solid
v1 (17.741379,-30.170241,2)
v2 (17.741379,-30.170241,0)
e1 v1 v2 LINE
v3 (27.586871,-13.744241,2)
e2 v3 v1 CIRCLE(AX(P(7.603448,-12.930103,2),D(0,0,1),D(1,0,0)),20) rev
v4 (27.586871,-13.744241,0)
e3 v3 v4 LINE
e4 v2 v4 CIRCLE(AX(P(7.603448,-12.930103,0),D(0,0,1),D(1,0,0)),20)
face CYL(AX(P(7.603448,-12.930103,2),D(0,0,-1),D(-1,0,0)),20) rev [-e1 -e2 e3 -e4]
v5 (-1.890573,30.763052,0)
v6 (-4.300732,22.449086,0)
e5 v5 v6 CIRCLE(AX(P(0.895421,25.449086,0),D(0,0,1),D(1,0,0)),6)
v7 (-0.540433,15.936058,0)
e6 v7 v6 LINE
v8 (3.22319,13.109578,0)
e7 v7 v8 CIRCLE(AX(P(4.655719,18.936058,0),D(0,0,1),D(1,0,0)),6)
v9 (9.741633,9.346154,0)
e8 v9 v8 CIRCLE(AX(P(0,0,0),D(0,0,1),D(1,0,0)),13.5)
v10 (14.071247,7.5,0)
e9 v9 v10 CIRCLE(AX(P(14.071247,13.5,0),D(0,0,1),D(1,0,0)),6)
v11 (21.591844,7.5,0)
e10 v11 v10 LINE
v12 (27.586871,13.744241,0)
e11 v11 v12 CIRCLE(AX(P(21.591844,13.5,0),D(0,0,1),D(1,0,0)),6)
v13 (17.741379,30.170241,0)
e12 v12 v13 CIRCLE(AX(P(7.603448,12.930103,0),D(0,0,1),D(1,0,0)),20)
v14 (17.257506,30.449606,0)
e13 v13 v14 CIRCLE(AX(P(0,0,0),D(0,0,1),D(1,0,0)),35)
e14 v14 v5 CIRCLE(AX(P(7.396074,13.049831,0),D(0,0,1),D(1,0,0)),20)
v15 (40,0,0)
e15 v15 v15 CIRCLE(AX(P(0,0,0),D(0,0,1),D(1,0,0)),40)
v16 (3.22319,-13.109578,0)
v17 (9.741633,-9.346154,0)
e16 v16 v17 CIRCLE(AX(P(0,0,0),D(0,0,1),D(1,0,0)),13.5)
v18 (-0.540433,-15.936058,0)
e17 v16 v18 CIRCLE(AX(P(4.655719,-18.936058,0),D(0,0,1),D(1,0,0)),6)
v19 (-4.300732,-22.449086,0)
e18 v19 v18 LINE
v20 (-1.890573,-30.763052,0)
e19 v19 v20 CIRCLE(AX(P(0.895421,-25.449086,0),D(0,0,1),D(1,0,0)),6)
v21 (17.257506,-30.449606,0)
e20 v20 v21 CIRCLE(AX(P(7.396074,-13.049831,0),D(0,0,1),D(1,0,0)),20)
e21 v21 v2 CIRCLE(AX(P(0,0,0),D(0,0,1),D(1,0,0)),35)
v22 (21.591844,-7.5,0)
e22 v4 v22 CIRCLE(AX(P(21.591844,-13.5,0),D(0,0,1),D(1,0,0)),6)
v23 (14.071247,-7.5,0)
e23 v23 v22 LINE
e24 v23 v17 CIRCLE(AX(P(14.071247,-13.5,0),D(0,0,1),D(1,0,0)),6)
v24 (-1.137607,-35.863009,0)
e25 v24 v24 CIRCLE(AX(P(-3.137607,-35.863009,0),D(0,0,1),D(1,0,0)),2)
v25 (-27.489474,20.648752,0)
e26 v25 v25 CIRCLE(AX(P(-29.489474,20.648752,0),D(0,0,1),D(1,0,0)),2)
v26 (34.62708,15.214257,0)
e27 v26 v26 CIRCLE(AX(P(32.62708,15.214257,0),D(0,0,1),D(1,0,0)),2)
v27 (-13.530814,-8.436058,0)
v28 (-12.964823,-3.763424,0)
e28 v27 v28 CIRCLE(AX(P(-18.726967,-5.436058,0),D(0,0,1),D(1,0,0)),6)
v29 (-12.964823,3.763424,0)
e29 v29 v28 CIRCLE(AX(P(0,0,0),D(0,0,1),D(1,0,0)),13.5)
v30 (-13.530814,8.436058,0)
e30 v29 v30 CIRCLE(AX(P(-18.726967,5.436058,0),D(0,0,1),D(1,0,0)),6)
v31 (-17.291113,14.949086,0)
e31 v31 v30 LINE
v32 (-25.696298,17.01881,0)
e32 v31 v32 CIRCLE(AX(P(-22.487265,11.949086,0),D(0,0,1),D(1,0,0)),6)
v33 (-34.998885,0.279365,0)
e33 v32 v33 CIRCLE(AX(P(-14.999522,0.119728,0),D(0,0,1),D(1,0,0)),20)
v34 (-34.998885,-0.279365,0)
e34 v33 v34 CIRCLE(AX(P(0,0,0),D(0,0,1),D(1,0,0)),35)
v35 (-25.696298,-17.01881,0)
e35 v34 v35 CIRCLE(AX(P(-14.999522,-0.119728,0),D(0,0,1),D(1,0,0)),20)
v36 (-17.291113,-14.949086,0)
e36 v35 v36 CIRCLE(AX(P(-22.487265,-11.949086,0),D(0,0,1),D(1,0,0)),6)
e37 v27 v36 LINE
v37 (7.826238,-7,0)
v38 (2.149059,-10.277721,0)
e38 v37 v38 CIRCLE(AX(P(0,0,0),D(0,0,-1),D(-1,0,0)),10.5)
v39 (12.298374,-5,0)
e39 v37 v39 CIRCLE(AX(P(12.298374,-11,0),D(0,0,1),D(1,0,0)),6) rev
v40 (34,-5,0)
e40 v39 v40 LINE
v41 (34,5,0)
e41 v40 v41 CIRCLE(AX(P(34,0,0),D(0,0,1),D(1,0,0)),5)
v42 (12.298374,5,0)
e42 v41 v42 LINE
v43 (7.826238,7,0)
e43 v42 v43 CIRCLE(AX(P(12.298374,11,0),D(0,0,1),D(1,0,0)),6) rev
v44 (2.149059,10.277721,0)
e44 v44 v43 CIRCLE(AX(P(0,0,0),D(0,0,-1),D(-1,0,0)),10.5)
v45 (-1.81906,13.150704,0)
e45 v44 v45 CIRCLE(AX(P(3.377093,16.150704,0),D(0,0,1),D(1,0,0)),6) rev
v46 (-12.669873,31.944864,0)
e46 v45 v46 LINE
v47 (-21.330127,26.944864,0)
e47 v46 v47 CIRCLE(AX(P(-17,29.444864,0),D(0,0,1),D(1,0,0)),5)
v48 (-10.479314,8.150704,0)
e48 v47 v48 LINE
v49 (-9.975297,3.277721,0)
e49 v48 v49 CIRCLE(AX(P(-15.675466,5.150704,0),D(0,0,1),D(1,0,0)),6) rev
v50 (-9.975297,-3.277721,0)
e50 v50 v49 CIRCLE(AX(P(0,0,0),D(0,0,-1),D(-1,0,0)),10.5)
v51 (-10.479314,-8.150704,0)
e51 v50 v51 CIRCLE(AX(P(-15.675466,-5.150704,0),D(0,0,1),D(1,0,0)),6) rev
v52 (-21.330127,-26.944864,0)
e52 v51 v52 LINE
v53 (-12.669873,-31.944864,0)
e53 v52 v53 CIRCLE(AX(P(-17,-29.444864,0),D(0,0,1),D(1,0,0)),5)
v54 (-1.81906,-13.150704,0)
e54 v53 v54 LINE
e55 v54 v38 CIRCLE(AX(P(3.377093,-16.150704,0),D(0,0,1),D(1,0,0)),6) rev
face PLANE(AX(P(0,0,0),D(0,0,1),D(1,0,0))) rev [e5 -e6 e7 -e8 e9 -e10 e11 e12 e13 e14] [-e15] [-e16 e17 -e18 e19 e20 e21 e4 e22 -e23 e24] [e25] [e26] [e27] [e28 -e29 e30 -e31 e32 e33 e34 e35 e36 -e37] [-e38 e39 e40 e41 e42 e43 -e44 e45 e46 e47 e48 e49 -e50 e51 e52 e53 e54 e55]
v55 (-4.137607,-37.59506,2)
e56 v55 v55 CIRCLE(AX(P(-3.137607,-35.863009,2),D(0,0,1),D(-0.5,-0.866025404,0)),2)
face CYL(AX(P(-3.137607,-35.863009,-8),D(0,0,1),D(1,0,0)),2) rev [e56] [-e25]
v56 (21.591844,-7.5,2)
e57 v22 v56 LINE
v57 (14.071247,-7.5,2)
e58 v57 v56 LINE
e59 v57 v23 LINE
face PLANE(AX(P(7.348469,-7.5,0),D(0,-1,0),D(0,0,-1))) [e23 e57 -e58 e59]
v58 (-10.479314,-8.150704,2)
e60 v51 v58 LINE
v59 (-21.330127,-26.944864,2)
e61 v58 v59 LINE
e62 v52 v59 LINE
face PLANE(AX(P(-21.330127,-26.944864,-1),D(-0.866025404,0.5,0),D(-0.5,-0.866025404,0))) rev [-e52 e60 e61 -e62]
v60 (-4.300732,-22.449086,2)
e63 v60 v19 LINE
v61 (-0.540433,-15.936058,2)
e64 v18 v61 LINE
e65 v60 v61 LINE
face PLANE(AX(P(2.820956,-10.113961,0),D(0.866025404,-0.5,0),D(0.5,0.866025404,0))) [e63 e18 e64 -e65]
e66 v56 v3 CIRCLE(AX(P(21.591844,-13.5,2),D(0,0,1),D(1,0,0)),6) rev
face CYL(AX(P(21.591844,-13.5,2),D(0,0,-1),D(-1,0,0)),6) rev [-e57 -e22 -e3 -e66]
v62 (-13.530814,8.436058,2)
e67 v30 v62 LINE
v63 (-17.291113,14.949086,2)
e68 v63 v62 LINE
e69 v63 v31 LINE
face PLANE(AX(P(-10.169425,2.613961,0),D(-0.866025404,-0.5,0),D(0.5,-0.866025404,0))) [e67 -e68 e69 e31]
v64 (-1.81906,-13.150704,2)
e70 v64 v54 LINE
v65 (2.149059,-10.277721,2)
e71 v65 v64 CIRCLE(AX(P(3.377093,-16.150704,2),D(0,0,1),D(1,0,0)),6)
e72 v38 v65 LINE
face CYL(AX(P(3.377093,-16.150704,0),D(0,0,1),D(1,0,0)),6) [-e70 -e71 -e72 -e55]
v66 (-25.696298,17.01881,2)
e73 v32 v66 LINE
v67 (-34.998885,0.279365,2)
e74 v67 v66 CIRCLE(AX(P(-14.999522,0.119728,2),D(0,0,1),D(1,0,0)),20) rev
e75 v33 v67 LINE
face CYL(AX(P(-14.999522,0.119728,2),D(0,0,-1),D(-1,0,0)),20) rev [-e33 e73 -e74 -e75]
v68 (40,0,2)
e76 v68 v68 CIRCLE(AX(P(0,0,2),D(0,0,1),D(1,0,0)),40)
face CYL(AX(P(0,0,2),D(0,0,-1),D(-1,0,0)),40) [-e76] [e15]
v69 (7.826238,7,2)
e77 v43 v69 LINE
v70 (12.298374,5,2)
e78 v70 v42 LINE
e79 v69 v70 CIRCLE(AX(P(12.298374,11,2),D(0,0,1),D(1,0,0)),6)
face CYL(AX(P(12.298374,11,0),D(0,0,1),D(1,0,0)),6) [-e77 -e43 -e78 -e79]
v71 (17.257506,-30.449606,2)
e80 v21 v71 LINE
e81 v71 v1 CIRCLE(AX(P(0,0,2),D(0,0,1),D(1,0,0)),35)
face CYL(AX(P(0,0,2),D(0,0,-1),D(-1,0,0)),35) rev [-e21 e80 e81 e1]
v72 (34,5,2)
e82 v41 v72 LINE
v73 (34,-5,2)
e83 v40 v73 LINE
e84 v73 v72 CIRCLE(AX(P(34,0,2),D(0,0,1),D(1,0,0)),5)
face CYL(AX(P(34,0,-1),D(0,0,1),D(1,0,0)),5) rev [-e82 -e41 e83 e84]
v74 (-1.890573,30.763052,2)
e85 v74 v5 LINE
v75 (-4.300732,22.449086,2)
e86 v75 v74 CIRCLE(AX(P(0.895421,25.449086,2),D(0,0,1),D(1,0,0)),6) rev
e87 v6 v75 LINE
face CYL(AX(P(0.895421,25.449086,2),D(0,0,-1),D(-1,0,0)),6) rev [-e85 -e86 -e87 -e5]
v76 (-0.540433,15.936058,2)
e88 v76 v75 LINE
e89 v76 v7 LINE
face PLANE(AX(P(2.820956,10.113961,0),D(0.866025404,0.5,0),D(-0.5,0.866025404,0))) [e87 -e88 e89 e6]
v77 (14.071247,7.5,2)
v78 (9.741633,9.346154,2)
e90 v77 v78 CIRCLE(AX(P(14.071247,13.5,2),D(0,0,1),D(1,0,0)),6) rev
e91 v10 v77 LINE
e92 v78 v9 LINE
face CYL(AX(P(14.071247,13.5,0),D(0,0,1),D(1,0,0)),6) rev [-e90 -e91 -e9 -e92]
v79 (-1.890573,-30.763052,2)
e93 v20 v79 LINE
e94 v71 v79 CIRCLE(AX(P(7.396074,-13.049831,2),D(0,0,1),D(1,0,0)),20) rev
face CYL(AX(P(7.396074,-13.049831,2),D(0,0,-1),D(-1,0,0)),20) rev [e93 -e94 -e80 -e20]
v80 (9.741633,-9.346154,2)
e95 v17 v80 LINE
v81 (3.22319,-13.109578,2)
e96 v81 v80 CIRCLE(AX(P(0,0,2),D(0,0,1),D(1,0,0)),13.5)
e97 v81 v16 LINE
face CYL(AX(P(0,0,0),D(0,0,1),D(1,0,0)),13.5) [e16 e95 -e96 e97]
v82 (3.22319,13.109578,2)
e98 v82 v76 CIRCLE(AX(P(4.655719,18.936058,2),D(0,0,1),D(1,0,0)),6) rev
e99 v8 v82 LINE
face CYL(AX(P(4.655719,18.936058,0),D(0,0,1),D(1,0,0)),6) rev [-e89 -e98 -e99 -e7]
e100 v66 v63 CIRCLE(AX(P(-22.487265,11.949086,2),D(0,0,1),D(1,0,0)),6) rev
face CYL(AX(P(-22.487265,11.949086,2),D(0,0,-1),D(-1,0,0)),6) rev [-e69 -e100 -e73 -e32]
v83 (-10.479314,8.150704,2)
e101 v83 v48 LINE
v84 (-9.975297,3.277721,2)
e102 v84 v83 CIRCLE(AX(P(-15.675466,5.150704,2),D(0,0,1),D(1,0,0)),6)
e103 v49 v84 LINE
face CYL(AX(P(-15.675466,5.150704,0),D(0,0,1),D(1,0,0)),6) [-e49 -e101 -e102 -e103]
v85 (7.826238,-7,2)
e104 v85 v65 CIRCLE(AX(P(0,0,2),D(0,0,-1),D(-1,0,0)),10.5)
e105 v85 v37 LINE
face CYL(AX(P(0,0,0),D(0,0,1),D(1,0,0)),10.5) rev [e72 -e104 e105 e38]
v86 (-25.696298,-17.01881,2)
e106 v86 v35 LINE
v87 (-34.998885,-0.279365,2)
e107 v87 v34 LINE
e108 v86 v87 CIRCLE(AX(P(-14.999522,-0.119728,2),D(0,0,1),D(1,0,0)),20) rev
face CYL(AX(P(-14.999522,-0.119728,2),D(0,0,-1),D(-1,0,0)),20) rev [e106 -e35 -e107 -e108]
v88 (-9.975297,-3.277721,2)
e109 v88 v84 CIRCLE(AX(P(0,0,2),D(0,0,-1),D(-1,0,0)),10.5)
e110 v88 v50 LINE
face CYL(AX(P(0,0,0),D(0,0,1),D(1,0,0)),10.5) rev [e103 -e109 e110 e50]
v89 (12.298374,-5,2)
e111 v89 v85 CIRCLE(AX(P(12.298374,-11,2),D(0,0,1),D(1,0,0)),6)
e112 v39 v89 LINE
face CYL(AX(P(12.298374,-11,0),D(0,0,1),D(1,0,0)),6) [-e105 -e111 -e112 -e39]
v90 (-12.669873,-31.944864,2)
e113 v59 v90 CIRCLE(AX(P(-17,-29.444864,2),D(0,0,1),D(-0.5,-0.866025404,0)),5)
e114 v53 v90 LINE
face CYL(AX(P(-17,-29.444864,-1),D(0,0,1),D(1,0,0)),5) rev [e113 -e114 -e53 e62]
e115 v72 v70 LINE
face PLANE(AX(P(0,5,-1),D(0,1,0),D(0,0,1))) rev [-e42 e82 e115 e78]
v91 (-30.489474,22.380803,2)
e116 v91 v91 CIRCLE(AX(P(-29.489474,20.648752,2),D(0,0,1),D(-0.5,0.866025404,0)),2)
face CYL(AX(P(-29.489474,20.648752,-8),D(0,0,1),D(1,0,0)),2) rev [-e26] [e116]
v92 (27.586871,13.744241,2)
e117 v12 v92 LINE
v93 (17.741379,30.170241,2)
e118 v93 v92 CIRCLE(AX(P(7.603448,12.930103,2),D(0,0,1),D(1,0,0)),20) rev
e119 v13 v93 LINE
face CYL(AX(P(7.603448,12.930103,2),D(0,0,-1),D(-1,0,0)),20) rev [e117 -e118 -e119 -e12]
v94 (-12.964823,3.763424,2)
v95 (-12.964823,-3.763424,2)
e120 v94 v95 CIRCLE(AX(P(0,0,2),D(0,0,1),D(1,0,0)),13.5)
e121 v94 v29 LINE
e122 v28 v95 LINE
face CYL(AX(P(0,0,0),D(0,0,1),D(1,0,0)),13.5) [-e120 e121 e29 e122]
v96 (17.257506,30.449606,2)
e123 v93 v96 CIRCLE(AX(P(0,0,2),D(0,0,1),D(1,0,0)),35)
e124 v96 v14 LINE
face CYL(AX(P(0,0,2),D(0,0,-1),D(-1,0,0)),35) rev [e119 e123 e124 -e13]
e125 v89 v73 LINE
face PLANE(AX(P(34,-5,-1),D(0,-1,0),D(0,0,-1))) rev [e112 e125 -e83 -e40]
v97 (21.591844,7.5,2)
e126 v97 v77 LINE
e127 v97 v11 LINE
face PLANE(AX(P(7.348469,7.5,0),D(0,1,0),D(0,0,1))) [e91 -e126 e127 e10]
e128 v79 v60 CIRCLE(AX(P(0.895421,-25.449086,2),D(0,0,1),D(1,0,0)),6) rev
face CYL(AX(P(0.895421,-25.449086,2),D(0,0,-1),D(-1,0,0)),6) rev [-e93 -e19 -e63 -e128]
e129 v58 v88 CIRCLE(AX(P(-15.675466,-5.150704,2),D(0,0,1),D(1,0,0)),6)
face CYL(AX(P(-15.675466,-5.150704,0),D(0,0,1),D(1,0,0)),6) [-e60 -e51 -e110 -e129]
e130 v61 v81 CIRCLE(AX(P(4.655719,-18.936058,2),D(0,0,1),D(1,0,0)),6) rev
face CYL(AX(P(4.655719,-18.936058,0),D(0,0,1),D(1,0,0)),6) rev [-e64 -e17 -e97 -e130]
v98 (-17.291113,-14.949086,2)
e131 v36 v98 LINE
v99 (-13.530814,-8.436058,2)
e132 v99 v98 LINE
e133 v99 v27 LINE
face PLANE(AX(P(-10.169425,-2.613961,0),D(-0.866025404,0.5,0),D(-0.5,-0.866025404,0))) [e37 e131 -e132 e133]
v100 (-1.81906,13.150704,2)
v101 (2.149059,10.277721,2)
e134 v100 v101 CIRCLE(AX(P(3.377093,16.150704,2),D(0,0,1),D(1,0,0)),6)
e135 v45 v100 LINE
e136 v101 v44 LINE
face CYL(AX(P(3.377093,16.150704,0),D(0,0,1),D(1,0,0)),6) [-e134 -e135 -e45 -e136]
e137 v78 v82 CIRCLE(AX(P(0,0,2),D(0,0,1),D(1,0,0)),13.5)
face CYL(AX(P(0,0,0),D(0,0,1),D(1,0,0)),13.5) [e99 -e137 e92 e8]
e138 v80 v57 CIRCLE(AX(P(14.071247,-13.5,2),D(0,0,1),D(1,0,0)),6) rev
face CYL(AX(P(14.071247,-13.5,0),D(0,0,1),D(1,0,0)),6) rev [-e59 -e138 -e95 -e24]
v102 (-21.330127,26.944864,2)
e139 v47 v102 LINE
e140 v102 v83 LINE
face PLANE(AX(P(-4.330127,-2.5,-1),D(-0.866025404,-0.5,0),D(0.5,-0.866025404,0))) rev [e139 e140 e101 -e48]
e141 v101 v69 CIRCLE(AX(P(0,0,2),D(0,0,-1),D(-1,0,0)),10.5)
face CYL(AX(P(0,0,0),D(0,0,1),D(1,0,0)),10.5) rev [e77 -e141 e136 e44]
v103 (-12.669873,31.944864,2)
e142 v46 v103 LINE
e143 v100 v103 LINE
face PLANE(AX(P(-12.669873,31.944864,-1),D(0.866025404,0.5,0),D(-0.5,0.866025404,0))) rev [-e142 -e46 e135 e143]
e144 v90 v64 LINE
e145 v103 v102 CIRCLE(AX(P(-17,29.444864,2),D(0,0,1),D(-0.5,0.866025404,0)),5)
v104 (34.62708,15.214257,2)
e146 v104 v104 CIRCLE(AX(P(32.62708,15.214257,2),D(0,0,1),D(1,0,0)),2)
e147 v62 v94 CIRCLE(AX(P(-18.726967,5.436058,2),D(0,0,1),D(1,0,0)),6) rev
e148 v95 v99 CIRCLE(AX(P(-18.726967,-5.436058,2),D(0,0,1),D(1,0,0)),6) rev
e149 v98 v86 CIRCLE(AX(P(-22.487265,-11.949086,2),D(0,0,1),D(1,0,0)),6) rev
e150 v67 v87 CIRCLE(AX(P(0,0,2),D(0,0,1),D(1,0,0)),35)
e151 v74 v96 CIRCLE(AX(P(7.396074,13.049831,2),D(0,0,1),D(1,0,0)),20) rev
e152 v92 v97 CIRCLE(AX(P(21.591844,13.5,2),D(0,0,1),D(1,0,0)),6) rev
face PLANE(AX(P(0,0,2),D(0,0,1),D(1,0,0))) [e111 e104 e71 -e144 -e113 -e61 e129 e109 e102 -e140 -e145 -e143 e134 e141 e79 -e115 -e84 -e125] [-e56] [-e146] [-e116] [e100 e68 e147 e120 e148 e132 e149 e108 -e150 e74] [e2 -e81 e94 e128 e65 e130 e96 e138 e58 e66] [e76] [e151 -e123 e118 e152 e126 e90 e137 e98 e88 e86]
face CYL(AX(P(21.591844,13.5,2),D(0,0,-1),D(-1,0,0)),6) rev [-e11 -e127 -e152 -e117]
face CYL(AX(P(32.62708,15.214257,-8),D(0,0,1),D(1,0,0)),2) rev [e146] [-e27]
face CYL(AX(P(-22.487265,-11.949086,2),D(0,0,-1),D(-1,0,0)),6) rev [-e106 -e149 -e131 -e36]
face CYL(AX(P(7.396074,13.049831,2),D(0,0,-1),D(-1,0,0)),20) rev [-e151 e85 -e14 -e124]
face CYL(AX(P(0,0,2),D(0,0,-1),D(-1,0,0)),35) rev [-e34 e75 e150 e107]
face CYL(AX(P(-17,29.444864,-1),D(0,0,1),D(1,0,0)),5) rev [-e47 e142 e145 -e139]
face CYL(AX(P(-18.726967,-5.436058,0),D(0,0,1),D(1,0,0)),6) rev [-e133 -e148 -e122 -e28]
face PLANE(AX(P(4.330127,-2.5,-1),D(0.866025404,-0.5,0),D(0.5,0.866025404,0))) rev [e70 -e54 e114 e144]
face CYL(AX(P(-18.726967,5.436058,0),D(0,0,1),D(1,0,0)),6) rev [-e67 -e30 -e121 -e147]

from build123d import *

# Parameters (mm, degrees)
SKETCH1_R                = 40
SKETCH1_R_2              = 35
BOSS_EXTRUDE1_DEPTH      = 2
BOSS_EXTRUDE2_DEPTH      = 2
SKETCH3_R                = 3
CUT_EXTRUDE1_DEPTH       = 2
FILLET1_DEPTH            = 2
SKETCH4_R                = 2
CUT_EXTRUDE2_DEPTH       = 10
BOSS_EXTRUDE3_START      = -2
BOSS_EXTRUDE3_DEPTH      = 2
BOSS_EXTRUDE4_START      = -2
SKETCH7_R                = 13.5
SKETCH7_R_2              = 10.5
BOSS_EXTRUDE4_DEPTH      = 2
FILLET2_R                = 6
CUT_EXTRUDE3_DEPTH       = 3
CIRPATTERN1_COUNT        = 3
FILLET2_OF_CIRPATTERN1_R = 6
FILLET3_R                = 6


with BuildPart() as part:
    # Sketch1 → Boss-Extrude1 (new body)
    with BuildSketch(Plane.XY):
        Circle(SKETCH1_R)
        Circle(SKETCH1_R_2, mode=Mode.SUBTRACT)
    extrude(amount=BOSS_EXTRUDE1_DEPTH)

    # Sketch2 → Boss-Extrude2 (add)
    with BuildSketch(Plane(origin=(0, 0, 0), x_dir=(-1, 0, 0), z_dir=(0, 0, -1))):
        with BuildLine():
            Line((-29, 5), (-34.641016151, 5))
            Line((-34.641016151, 5), (-37.165171868, 5))
            ThreePointArc((-37.165171868, 5), (-37.5, 0), (-37.165171868, -5))
            Line((-37.165171868, -5), (-29, -5))
            ThreePointArc((-29, -5), (-24, 0), (-29, 5))
        make_face()
        with BuildLine():
            Line((-34, -3), (-29, -3))
            ThreePointArc((-29, -3), (-26, 0), (-29, 3))
            Line((-29, 3), (-34, 3))
            ThreePointArc((-34, 3), (-37, 0), (-34, -3))
        make_face(mode=Mode.SUBTRACT)
    boss_extrude2 = extrude(amount=-BOSS_EXTRUDE2_DEPTH)

    # Sketch3 → Cut-Extrude1 (cut)
    with BuildSketch(Plane(origin=(0, 0, 0), x_dir=(-1, 0, 0), z_dir=(0, 0, -1))):
        with Locations((-34, 0)):
            Circle(SKETCH3_R)
    cut_extrude1 = extrude(amount=-CUT_EXTRUDE1_DEPTH, mode=Mode.SUBTRACT)

    # Fillet1: read off the stored shape, not the designer's step
    # Fillet1 outline → Fillet1 (add)
    with BuildSketch(Plane.XY):
        with BuildLine():
            ThreePointArc((29, -5), (26.543386825, -4.354888254), (24.720689655, -2.586020683))
            ThreePointArc((24.720689655, -2.586020683), (26.992450638, -17.835874241), (17.74137931, -30.170241301))
            ThreePointArc((17.74137931, -30.170241301), (29.057943842, -19.509892353), (34.641016151, -5))
            Line((34.641016151, -5), (29, -5))
        make_face()
        with BuildLine():
            ThreePointArc((17.74137931, 30.170241301), (26.992450638, 17.835874241), (24.720689655, 2.586020683))
            ThreePointArc((24.720689655, 2.586020683), (26.543386825, 4.354888254), (29, 5))
            Line((29, 5), (34.641016151, 5))
            ThreePointArc((34.641016151, 5), (29.057943842, 19.509892353), (17.74137931, 30.170241301))
        make_face()
    fillet1 = extrude(amount=FILLET1_DEPTH)

    # Sketch4 → Cut-Extrude2 (cut)
    with BuildSketch(Plane.XY.offset(2)):
        with Locations((32.627080333, 15.214257423)):
            Circle(SKETCH4_R)
    cut_extrude2 = extrude(amount=-CUT_EXTRUDE2_DEPTH, mode=Mode.SUBTRACT)

    # Sketch5 → Boss-Extrude3 (add)
    with BuildSketch(Plane.XY.offset(2).offset(BOSS_EXTRUDE3_START)):
        with BuildLine():
            Line((7.348469228, 7.5), (34.186985828, 7.5))
            ThreePointArc((34.186985828, 7.5), (34.60231879, 5.261134323), (34.871191548, 3))
            Line((34.871191548, 3), (29, 3))
            ThreePointArc((29, 3), (26, 0), (29, -3))
            Line((29, -3), (34.871191548, -3))
            ThreePointArc((34.871191548, -3), (34.60231879, -5.261134323), (34.186985828, -7.5))
            Line((34.186985828, -7.5), (7.348469228, -7.5))
            ThreePointArc((7.348469228, -7.5), (10.5, 0), (7.348469228, 7.5))
        make_face()
    boss_extrude3 = extrude(amount=BOSS_EXTRUDE3_DEPTH)

    # Sketch7 → Boss-Extrude4 (add)
    with BuildSketch(Plane.XY.offset(2).offset(BOSS_EXTRUDE4_START)):
        Circle(SKETCH7_R)
        with Locations(Location((0, 0, 0), (0, 0, 180))):
            Circle(SKETCH7_R_2, mode=Mode.SUBTRACT)
    extrude(amount=BOSS_EXTRUDE4_DEPTH)

    # Fillet2
    fillet2_edges = [part.edges().sort_by_distance(p)[0] for p in [
        (11.22497216, 7.5, 1),
        (11.22497216, -7.5, 1),
        (26.852187894, 7.5, 1),
        (26.852187894, -7.5, 1),
    ]]
    fillet(fillet2_edges, radius=FILLET2_R)

    # Sketch6 → Cut-Extrude3 (cut)
    with BuildSketch(Plane.XY.offset(2)):
        with BuildLine():
            Line((0, 5), (34, 5))
            ThreePointArc((34, 5), (39, 0), (34, -5))
            Line((34, -5), (0, -5))
            Line((0, -5), (0, 5))
        make_face()
    cut_extrude3 = extrude(amount=-CUT_EXTRUDE3_DEPTH, mode=Mode.SUBTRACT)

    # CirPattern1: Boss-Extrude2, Cut-Extrude1, Fillet1, Cut-Extrude2, Boss-Extrude3, Cut-Extrude3 ×3 about axis
    cirpattern1_axis = Axis((0, 0, 0), (0, 0, 1))
    add([boss_extrude2.rotate(cirpattern1_axis, i * 360 / CIRPATTERN1_COUNT) for i in range(1, CIRPATTERN1_COUNT)])
    add([cut_extrude1.rotate(cirpattern1_axis, i * 360 / CIRPATTERN1_COUNT) for i in range(1, CIRPATTERN1_COUNT)], mode=Mode.SUBTRACT)
    add([fillet1.rotate(cirpattern1_axis, i * 360 / CIRPATTERN1_COUNT) for i in range(1, CIRPATTERN1_COUNT)])
    add([cut_extrude2.rotate(cirpattern1_axis, i * 360 / CIRPATTERN1_COUNT) for i in range(1, CIRPATTERN1_COUNT)], mode=Mode.SUBTRACT)
    add([boss_extrude3.rotate(cirpattern1_axis, i * 360 / CIRPATTERN1_COUNT) for i in range(1, CIRPATTERN1_COUNT)])
    add([cut_extrude3.rotate(cirpattern1_axis, i * 360 / CIRPATTERN1_COUNT) for i in range(1, CIRPATTERN1_COUNT)], mode=Mode.SUBTRACT)

    # Fillet2 of CirPattern1
    fillet2_of_cirpattern1_edges = [part.edges().sort_by_distance(p)[0] for p in [
        (-12.107676609, 5.971111048, 1),
        (0.882704448, 13.471111048, 1),
        (-19.921284476, 19.504676864, 1),
        (-6.930903419, 27.004676864, 1),
        (0.882704448, -13.471111048, 1),
        (-12.107676609, -5.971111048, 1),
        (-6.930903419, -27.004676864, 1),
        (-19.921284476, -19.504676864, 1),
    ]]
    fillet(fillet2_of_cirpattern1_edges, radius=FILLET2_OF_CIRPATTERN1_R)

    # Fillet3
    fillet3_edges = [part.edges().sort_by_distance(p)[0] for p in [
        (9.233092656, -5, 1),
        (9.233092656, 5, 1),
        (-0.286419309, 10.496092796, 1),
        (-8.946673347, 5.496092796, 1),
        (-8.946673347, -5.496092796, 1),
        (-0.286419309, -10.496092796, 1),
    ]]
    fillet(fillet3_edges, radius=FILLET3_R)


solid = part.part
